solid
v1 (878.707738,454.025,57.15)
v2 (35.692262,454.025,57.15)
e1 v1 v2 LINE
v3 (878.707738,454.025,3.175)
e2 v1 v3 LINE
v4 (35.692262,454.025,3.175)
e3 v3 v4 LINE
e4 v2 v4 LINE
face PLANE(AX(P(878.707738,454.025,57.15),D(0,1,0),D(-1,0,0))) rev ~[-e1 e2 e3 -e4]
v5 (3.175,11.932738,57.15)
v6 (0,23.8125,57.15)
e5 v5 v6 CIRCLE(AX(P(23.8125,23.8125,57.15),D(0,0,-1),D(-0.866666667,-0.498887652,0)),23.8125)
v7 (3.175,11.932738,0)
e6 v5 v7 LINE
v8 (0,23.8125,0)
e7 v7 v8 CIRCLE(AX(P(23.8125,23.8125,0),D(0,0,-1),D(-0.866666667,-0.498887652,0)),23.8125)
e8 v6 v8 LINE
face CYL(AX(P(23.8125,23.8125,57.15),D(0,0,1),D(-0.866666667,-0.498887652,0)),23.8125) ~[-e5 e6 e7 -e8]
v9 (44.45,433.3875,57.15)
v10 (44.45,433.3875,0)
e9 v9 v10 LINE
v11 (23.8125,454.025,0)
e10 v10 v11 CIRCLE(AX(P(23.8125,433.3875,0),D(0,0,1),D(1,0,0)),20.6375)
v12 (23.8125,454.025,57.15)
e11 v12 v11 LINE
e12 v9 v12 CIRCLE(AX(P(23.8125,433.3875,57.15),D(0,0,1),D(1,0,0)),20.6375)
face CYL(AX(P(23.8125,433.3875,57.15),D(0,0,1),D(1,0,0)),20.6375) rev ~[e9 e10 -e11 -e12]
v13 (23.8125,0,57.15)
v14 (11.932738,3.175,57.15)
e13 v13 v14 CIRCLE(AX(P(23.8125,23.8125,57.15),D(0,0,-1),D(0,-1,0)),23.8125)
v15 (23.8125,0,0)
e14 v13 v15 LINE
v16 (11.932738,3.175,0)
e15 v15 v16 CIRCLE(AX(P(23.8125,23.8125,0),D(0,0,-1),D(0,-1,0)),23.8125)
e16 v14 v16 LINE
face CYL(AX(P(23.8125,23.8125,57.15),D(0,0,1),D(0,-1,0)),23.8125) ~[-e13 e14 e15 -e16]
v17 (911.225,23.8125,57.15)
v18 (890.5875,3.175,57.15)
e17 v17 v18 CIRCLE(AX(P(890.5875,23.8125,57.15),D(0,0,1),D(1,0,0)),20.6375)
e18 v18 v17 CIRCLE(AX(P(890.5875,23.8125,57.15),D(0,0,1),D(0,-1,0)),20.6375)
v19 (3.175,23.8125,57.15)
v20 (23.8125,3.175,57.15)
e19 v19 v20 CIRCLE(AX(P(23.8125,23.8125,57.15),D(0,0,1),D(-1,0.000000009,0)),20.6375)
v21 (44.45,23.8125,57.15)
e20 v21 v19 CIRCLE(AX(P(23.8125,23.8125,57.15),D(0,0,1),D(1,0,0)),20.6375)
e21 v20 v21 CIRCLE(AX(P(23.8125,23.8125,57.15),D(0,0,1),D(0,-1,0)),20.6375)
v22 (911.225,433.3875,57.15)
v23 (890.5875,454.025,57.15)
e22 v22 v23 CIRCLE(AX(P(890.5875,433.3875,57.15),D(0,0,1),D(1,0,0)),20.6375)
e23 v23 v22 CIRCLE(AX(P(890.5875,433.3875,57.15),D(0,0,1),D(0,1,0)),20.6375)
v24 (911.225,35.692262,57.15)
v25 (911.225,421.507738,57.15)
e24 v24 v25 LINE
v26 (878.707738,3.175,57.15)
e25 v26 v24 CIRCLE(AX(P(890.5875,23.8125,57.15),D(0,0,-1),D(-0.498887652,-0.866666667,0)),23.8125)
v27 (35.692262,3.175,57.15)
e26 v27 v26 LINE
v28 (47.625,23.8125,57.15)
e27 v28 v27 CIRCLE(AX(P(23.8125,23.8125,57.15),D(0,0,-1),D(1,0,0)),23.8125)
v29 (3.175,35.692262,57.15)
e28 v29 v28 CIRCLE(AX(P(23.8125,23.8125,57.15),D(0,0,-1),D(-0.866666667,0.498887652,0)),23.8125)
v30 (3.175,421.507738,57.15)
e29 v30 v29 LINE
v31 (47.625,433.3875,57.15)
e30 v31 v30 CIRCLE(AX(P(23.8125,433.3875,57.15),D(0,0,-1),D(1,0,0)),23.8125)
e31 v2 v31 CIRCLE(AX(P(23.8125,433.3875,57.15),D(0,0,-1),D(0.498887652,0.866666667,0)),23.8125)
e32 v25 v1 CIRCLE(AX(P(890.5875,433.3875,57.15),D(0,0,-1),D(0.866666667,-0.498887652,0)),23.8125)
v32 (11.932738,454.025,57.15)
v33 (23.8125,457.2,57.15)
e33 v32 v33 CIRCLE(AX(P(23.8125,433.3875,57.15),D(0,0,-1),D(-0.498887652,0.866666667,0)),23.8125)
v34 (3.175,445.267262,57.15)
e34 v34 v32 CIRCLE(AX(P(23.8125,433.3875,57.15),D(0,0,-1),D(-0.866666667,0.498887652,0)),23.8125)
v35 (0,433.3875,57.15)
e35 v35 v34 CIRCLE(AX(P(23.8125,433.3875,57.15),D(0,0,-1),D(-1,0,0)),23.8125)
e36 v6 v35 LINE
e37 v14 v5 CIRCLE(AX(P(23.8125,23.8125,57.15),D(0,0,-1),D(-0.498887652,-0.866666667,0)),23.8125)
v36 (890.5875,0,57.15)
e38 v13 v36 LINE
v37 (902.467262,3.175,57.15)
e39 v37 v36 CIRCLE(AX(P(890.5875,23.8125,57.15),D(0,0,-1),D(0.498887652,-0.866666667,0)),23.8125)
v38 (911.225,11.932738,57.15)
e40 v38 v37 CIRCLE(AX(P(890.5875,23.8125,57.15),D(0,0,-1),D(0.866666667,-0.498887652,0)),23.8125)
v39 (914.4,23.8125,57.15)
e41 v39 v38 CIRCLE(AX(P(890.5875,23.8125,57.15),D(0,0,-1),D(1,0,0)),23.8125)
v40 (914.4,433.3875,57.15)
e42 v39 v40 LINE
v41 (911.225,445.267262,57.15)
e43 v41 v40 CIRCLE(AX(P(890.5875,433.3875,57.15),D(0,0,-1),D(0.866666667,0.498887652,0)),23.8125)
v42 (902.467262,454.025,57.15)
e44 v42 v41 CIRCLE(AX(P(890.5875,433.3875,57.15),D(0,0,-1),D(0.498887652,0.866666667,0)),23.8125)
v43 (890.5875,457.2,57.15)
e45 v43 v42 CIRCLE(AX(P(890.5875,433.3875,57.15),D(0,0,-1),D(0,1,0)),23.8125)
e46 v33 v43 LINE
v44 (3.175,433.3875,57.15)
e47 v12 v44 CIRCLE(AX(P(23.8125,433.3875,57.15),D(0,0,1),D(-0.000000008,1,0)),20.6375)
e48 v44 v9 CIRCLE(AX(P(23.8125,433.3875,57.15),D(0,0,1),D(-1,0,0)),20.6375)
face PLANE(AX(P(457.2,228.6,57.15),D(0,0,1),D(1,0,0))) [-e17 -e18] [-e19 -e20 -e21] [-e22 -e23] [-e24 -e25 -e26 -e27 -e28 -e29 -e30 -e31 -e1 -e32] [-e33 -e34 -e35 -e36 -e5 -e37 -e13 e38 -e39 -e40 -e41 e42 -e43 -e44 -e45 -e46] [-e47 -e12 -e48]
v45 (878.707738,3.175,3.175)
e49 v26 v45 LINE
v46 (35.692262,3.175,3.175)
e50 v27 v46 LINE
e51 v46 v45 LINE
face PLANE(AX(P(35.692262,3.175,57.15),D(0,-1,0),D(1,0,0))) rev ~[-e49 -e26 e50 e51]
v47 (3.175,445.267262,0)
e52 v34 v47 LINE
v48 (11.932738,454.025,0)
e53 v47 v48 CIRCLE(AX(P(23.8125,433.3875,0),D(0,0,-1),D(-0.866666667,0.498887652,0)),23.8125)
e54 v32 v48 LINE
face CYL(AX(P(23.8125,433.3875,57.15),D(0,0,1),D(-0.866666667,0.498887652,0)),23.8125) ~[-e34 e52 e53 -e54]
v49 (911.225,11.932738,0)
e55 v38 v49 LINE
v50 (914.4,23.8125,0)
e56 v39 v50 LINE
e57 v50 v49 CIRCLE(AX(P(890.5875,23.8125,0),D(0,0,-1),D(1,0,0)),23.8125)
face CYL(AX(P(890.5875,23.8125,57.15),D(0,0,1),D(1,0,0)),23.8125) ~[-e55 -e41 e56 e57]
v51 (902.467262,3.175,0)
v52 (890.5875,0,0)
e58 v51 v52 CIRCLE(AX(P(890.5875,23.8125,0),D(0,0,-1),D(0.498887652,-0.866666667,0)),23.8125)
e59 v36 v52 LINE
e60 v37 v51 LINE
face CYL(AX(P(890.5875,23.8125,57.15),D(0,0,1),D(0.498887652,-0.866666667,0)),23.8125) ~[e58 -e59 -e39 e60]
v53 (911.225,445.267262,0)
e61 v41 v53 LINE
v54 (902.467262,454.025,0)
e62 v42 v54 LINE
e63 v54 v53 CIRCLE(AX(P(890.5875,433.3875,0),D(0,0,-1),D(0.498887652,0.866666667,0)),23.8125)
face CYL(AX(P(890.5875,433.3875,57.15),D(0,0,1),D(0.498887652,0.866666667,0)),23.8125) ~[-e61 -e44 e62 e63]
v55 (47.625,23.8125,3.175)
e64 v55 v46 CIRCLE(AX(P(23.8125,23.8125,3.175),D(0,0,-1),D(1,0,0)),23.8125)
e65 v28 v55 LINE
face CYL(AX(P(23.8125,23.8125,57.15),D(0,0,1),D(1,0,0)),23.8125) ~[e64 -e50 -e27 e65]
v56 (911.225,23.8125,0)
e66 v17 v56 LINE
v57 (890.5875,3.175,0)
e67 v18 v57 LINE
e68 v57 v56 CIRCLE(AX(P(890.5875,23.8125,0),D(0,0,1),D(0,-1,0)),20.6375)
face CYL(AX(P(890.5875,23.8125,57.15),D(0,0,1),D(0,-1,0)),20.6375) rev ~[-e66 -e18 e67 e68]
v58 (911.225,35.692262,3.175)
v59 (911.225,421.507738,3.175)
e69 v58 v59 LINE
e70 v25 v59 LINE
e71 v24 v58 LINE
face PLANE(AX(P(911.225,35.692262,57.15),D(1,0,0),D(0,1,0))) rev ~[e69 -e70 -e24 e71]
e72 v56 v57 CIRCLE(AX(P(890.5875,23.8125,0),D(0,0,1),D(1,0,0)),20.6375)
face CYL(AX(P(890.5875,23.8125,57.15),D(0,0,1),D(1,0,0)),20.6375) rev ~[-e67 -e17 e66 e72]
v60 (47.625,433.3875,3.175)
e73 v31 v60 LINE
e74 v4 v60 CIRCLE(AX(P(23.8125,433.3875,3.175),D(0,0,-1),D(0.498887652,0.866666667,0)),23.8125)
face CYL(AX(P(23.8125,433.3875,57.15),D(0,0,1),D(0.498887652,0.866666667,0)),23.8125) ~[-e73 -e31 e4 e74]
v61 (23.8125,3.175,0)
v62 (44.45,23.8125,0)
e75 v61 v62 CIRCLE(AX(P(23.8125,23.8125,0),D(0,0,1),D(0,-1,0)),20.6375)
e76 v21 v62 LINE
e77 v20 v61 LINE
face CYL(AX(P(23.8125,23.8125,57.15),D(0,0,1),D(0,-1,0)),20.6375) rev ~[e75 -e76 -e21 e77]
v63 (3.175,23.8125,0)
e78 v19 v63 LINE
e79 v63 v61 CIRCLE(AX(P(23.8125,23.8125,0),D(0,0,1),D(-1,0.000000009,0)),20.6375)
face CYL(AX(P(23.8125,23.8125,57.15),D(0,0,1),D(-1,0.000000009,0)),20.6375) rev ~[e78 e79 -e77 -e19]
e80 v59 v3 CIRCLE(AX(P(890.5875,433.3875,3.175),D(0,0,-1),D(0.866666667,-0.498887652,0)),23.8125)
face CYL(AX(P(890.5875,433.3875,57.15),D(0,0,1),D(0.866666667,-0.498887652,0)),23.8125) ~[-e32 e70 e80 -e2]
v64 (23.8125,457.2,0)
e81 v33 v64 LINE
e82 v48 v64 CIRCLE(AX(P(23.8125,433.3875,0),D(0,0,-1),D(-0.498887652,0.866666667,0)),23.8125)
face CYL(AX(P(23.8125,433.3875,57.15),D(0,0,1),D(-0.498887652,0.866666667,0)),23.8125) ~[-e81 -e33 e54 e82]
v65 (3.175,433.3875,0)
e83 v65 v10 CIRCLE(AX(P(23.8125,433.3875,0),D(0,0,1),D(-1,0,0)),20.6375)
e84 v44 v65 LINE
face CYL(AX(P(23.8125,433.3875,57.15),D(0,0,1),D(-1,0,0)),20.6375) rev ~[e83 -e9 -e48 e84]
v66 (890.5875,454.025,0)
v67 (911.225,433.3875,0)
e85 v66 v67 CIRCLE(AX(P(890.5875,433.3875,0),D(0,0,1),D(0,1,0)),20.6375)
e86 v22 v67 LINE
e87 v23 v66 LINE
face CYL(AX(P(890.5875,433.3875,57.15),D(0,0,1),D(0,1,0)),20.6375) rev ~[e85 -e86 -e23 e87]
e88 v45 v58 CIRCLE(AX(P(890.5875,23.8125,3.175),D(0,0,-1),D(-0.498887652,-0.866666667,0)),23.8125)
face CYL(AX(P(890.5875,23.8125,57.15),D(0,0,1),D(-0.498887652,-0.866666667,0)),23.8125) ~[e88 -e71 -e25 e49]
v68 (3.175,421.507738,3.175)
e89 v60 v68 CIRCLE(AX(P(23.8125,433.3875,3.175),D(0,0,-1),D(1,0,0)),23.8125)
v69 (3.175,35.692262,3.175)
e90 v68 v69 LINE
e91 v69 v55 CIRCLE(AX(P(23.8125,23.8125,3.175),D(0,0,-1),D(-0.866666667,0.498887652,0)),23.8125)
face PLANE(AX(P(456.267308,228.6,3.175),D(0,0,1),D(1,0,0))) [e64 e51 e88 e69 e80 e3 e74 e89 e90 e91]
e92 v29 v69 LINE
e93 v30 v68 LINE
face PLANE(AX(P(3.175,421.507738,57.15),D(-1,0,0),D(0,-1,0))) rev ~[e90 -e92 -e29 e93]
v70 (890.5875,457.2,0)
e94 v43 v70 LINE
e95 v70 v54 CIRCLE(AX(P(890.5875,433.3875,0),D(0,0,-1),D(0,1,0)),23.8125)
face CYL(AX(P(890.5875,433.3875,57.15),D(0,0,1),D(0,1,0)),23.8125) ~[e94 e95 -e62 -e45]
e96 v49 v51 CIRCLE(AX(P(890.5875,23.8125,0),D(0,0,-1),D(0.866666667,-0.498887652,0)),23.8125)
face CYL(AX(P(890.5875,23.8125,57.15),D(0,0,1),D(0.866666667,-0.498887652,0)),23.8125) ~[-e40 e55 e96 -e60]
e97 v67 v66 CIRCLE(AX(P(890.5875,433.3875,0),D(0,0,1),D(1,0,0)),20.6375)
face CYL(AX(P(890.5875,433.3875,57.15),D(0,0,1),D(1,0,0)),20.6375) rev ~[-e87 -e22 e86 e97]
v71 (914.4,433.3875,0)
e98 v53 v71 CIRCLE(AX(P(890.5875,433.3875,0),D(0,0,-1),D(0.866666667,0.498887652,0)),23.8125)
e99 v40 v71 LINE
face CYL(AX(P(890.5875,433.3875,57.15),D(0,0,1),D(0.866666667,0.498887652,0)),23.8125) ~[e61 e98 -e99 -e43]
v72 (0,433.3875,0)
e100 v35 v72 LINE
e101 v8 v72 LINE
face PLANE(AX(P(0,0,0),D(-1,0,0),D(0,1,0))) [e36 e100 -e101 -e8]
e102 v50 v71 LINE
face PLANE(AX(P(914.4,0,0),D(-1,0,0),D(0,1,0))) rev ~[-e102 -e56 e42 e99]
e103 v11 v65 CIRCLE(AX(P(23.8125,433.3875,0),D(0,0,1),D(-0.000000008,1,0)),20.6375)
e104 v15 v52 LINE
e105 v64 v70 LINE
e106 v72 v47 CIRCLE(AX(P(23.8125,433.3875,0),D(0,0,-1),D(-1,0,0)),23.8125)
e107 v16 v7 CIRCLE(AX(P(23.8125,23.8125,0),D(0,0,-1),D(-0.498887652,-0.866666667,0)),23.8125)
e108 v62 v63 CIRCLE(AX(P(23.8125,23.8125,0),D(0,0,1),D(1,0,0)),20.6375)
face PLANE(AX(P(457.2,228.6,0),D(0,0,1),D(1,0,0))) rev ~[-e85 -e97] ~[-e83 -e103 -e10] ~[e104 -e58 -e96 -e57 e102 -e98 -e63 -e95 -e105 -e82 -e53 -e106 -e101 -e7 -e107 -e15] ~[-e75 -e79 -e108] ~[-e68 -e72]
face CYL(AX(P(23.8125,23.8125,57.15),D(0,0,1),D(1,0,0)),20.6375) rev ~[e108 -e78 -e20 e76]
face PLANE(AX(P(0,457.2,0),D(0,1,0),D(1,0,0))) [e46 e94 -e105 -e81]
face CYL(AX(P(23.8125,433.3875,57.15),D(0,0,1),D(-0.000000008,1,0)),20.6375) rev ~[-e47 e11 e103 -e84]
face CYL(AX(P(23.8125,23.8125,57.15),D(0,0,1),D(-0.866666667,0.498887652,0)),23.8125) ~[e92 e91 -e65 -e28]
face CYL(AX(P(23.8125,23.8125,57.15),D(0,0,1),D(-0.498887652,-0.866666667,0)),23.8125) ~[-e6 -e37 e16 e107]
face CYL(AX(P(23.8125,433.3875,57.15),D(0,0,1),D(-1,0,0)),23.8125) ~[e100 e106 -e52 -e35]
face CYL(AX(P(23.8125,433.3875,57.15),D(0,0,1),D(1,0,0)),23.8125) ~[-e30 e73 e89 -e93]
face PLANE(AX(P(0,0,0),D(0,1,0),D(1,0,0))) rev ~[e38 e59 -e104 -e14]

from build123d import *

# Parameters (mm, degrees)
F2_W     = 914.4
F2_H     = 457.2
F3_DEPTH = 57.15
F5_DEPTH = 53.975
F6_DEPTH = 57.15


# Not quite as in the source:
# - a length typed as a fraction of an inch, garbled in the dataset ("3 / 203.2 mm" for 3/8 in), is restored


with BuildPart() as f3:
    # F2 (on Top) → F3 (new body)
    with BuildSketch(Plane.XY):
        with Locations((457.2, 228.6)):
            Rectangle(F2_W, F2_H)
    extrude(amount=F3_DEPTH)

    # F4 (on face) → F5 (cut)
    with BuildSketch(Plane.XY.offset(57.15)):
        with BuildLine():
            ThreePointArc((47.625, 23.8125), (44.4270821412, 11.8930134592), (35.692262203, 3.175))
            Line((35.692262203, 3.175), (878.707737797, 3.175))
            ThreePointArc((878.707737797, 3.175), (873.749519773, 40.650480227), (911.225, 35.692262203))
            Line((911.225, 35.692262203), (911.225, 421.507737797))
            ThreePointArc((911.225, 421.507737797), (873.749519773, 416.549519773), (878.707737797, 454.025))
            Line((878.707737797, 454.025), (35.692262203, 454.025))
            ThreePointArc((35.692262203, 454.025), (44.4270821412, 445.3069865408), (47.625, 433.3875))
            ThreePointArc((47.625, 433.3875), (29.9608610621, 410.3824394154), (3.175, 421.507737797))
            Line((3.175, 421.507737797), (3.175, 35.692262203))
            ThreePointArc((3.175, 35.692262203), (29.9608610621, 46.8175605846), (47.625, 23.8125))
        make_face()
    extrude(amount=-F5_DEPTH, mode=Mode.SUBTRACT)

    # F4 (on face) → F6 (cut)
    with BuildSketch(Plane.XY.offset(57.15)):
        with BuildLine():
            Line((11.932737797, 3.175), (3.175, 3.175))
            Line((3.175, 3.175), (3.175, 11.932737797))
            ThreePointArc((3.175, 11.932737797), (0.8074394304, 17.6641388819), (0, 23.8124998841))
            Line((0, 23.8124998841), (0, 0))
            Line((0, 0), (23.8125, 0))
            ThreePointArc((23.8125, 0), (17.6641389379, 0.8074394154), (11.932737797, 3.175))
        make_face()
        with BuildLine():
            Line((3.175, 11.932737797), (3.175, 3.175))
            Line((3.175, 3.175), (11.932737797, 3.175))
            ThreePointArc((11.932737797, 3.175), (6.974519773, 6.974519773), (3.175, 11.932737797))
        make_face()
        with BuildLine():
            ThreePointArc((3.175, 23.8125001882), (9.2195837367, 9.2195838698), (23.8125, 3.175))
            ThreePointArc((23.8125, 3.175), (38.4054161967, 9.2195838033), (44.45, 23.8125))
            ThreePointArc((44.45, 23.8125), (23.8125000941, 44.45), (3.175, 23.8125001882))
        make_face()
        with BuildLine():
            ThreePointArc((23.8124998376, 454.025), (9.2195837458, 447.9804161393), (3.175, 433.3875))
            ThreePointArc((3.175, 433.3875), (23.8125, 412.75), (44.45, 433.3875))
            ThreePointArc((44.45, 433.3875), (38.4054161393, 447.9804162542), (23.8124998376, 454.025))
        make_face()
        with BuildLine():
            Line((3.175, 454.025), (3.175, 445.267262203))
            ThreePointArc((3.175, 445.267262203), (6.974519773, 450.225480227), (11.932737797, 454.025))
            Line((11.932737797, 454.025), (3.175, 454.025))
        make_face()
        with BuildLine():
            Line((0, 457.2), (0, 433.3875))
            ThreePointArc((0, 433.3875), (0.8074394154, 439.5358610621), (3.175, 445.267262203))
            Line((3.175, 445.267262203), (3.175, 454.025))
            Line((3.175, 454.025), (11.932737797, 454.025))
            ThreePointArc((11.932737797, 454.025), (17.6641390246, 456.3925606078), (23.8125001795, 457.2))
            Line((23.8125001795, 457.2), (0, 457.2))
        make_face()
        with BuildLine():
            ThreePointArc((902.467262203, 454.025), (907.425480227, 450.225480227), (911.225, 445.267262203))
            Line((911.225, 445.267262203), (911.225, 454.025))
            Line((911.225, 454.025), (902.467262203, 454.025))
        make_face()
        with BuildLine():
            ThreePointArc((911.225, 445.267262203), (913.5925605846, 439.5358610621), (914.4, 433.3875))
            Line((914.4, 433.3875), (914.4, 457.2))
            Line((914.4, 457.2), (890.5875, 457.2))
            ThreePointArc((890.5875, 457.2), (896.7358610621, 456.3925605846), (902.467262203, 454.025))
            Line((902.467262203, 454.025), (911.225, 454.025))
            Line((911.225, 454.025), (911.225, 445.267262203))
        make_face()
        with BuildLine():
            ThreePointArc((890.5875, 454.025), (875.9945838033, 418.7945838033), (911.225, 433.3875))
            ThreePointArc((911.225, 433.3875), (905.1804161967, 447.9804161967), (890.5875, 454.025))
        make_face()
        with BuildLine():
            ThreePointArc((911.225, 11.932737797), (907.425480227, 6.974519773), (902.467262203, 3.175))
            Line((902.467262203, 3.175), (911.225, 3.175))
            Line((911.225, 3.175), (911.225, 11.932737797))
        make_face()
        with BuildLine():
            ThreePointArc((902.467262203, 3.175), (896.7358610621, 0.8074394154), (890.5875, 0))
            Line((890.5875, 0), (914.4, 0))
            Line((914.4, 0), (914.4, 23.8125))
            ThreePointArc((914.4, 23.8125), (913.5925605846, 17.6641389379), (911.225, 11.932737797))
            Line((911.225, 11.932737797), (911.225, 3.175))
            Line((911.225, 3.175), (902.467262203, 3.175))
        make_face()
        with BuildLine():
            ThreePointArc((911.225, 23.8125), (875.9945838033, 38.4054161967), (890.5875, 3.175))
            ThreePointArc((890.5875, 3.175), (905.1804161967, 9.2195838033), (911.225, 23.8125))
        make_face()
    extrude(amount=-F6_DEPTH, mode=Mode.SUBTRACT)


solid = f3.part
